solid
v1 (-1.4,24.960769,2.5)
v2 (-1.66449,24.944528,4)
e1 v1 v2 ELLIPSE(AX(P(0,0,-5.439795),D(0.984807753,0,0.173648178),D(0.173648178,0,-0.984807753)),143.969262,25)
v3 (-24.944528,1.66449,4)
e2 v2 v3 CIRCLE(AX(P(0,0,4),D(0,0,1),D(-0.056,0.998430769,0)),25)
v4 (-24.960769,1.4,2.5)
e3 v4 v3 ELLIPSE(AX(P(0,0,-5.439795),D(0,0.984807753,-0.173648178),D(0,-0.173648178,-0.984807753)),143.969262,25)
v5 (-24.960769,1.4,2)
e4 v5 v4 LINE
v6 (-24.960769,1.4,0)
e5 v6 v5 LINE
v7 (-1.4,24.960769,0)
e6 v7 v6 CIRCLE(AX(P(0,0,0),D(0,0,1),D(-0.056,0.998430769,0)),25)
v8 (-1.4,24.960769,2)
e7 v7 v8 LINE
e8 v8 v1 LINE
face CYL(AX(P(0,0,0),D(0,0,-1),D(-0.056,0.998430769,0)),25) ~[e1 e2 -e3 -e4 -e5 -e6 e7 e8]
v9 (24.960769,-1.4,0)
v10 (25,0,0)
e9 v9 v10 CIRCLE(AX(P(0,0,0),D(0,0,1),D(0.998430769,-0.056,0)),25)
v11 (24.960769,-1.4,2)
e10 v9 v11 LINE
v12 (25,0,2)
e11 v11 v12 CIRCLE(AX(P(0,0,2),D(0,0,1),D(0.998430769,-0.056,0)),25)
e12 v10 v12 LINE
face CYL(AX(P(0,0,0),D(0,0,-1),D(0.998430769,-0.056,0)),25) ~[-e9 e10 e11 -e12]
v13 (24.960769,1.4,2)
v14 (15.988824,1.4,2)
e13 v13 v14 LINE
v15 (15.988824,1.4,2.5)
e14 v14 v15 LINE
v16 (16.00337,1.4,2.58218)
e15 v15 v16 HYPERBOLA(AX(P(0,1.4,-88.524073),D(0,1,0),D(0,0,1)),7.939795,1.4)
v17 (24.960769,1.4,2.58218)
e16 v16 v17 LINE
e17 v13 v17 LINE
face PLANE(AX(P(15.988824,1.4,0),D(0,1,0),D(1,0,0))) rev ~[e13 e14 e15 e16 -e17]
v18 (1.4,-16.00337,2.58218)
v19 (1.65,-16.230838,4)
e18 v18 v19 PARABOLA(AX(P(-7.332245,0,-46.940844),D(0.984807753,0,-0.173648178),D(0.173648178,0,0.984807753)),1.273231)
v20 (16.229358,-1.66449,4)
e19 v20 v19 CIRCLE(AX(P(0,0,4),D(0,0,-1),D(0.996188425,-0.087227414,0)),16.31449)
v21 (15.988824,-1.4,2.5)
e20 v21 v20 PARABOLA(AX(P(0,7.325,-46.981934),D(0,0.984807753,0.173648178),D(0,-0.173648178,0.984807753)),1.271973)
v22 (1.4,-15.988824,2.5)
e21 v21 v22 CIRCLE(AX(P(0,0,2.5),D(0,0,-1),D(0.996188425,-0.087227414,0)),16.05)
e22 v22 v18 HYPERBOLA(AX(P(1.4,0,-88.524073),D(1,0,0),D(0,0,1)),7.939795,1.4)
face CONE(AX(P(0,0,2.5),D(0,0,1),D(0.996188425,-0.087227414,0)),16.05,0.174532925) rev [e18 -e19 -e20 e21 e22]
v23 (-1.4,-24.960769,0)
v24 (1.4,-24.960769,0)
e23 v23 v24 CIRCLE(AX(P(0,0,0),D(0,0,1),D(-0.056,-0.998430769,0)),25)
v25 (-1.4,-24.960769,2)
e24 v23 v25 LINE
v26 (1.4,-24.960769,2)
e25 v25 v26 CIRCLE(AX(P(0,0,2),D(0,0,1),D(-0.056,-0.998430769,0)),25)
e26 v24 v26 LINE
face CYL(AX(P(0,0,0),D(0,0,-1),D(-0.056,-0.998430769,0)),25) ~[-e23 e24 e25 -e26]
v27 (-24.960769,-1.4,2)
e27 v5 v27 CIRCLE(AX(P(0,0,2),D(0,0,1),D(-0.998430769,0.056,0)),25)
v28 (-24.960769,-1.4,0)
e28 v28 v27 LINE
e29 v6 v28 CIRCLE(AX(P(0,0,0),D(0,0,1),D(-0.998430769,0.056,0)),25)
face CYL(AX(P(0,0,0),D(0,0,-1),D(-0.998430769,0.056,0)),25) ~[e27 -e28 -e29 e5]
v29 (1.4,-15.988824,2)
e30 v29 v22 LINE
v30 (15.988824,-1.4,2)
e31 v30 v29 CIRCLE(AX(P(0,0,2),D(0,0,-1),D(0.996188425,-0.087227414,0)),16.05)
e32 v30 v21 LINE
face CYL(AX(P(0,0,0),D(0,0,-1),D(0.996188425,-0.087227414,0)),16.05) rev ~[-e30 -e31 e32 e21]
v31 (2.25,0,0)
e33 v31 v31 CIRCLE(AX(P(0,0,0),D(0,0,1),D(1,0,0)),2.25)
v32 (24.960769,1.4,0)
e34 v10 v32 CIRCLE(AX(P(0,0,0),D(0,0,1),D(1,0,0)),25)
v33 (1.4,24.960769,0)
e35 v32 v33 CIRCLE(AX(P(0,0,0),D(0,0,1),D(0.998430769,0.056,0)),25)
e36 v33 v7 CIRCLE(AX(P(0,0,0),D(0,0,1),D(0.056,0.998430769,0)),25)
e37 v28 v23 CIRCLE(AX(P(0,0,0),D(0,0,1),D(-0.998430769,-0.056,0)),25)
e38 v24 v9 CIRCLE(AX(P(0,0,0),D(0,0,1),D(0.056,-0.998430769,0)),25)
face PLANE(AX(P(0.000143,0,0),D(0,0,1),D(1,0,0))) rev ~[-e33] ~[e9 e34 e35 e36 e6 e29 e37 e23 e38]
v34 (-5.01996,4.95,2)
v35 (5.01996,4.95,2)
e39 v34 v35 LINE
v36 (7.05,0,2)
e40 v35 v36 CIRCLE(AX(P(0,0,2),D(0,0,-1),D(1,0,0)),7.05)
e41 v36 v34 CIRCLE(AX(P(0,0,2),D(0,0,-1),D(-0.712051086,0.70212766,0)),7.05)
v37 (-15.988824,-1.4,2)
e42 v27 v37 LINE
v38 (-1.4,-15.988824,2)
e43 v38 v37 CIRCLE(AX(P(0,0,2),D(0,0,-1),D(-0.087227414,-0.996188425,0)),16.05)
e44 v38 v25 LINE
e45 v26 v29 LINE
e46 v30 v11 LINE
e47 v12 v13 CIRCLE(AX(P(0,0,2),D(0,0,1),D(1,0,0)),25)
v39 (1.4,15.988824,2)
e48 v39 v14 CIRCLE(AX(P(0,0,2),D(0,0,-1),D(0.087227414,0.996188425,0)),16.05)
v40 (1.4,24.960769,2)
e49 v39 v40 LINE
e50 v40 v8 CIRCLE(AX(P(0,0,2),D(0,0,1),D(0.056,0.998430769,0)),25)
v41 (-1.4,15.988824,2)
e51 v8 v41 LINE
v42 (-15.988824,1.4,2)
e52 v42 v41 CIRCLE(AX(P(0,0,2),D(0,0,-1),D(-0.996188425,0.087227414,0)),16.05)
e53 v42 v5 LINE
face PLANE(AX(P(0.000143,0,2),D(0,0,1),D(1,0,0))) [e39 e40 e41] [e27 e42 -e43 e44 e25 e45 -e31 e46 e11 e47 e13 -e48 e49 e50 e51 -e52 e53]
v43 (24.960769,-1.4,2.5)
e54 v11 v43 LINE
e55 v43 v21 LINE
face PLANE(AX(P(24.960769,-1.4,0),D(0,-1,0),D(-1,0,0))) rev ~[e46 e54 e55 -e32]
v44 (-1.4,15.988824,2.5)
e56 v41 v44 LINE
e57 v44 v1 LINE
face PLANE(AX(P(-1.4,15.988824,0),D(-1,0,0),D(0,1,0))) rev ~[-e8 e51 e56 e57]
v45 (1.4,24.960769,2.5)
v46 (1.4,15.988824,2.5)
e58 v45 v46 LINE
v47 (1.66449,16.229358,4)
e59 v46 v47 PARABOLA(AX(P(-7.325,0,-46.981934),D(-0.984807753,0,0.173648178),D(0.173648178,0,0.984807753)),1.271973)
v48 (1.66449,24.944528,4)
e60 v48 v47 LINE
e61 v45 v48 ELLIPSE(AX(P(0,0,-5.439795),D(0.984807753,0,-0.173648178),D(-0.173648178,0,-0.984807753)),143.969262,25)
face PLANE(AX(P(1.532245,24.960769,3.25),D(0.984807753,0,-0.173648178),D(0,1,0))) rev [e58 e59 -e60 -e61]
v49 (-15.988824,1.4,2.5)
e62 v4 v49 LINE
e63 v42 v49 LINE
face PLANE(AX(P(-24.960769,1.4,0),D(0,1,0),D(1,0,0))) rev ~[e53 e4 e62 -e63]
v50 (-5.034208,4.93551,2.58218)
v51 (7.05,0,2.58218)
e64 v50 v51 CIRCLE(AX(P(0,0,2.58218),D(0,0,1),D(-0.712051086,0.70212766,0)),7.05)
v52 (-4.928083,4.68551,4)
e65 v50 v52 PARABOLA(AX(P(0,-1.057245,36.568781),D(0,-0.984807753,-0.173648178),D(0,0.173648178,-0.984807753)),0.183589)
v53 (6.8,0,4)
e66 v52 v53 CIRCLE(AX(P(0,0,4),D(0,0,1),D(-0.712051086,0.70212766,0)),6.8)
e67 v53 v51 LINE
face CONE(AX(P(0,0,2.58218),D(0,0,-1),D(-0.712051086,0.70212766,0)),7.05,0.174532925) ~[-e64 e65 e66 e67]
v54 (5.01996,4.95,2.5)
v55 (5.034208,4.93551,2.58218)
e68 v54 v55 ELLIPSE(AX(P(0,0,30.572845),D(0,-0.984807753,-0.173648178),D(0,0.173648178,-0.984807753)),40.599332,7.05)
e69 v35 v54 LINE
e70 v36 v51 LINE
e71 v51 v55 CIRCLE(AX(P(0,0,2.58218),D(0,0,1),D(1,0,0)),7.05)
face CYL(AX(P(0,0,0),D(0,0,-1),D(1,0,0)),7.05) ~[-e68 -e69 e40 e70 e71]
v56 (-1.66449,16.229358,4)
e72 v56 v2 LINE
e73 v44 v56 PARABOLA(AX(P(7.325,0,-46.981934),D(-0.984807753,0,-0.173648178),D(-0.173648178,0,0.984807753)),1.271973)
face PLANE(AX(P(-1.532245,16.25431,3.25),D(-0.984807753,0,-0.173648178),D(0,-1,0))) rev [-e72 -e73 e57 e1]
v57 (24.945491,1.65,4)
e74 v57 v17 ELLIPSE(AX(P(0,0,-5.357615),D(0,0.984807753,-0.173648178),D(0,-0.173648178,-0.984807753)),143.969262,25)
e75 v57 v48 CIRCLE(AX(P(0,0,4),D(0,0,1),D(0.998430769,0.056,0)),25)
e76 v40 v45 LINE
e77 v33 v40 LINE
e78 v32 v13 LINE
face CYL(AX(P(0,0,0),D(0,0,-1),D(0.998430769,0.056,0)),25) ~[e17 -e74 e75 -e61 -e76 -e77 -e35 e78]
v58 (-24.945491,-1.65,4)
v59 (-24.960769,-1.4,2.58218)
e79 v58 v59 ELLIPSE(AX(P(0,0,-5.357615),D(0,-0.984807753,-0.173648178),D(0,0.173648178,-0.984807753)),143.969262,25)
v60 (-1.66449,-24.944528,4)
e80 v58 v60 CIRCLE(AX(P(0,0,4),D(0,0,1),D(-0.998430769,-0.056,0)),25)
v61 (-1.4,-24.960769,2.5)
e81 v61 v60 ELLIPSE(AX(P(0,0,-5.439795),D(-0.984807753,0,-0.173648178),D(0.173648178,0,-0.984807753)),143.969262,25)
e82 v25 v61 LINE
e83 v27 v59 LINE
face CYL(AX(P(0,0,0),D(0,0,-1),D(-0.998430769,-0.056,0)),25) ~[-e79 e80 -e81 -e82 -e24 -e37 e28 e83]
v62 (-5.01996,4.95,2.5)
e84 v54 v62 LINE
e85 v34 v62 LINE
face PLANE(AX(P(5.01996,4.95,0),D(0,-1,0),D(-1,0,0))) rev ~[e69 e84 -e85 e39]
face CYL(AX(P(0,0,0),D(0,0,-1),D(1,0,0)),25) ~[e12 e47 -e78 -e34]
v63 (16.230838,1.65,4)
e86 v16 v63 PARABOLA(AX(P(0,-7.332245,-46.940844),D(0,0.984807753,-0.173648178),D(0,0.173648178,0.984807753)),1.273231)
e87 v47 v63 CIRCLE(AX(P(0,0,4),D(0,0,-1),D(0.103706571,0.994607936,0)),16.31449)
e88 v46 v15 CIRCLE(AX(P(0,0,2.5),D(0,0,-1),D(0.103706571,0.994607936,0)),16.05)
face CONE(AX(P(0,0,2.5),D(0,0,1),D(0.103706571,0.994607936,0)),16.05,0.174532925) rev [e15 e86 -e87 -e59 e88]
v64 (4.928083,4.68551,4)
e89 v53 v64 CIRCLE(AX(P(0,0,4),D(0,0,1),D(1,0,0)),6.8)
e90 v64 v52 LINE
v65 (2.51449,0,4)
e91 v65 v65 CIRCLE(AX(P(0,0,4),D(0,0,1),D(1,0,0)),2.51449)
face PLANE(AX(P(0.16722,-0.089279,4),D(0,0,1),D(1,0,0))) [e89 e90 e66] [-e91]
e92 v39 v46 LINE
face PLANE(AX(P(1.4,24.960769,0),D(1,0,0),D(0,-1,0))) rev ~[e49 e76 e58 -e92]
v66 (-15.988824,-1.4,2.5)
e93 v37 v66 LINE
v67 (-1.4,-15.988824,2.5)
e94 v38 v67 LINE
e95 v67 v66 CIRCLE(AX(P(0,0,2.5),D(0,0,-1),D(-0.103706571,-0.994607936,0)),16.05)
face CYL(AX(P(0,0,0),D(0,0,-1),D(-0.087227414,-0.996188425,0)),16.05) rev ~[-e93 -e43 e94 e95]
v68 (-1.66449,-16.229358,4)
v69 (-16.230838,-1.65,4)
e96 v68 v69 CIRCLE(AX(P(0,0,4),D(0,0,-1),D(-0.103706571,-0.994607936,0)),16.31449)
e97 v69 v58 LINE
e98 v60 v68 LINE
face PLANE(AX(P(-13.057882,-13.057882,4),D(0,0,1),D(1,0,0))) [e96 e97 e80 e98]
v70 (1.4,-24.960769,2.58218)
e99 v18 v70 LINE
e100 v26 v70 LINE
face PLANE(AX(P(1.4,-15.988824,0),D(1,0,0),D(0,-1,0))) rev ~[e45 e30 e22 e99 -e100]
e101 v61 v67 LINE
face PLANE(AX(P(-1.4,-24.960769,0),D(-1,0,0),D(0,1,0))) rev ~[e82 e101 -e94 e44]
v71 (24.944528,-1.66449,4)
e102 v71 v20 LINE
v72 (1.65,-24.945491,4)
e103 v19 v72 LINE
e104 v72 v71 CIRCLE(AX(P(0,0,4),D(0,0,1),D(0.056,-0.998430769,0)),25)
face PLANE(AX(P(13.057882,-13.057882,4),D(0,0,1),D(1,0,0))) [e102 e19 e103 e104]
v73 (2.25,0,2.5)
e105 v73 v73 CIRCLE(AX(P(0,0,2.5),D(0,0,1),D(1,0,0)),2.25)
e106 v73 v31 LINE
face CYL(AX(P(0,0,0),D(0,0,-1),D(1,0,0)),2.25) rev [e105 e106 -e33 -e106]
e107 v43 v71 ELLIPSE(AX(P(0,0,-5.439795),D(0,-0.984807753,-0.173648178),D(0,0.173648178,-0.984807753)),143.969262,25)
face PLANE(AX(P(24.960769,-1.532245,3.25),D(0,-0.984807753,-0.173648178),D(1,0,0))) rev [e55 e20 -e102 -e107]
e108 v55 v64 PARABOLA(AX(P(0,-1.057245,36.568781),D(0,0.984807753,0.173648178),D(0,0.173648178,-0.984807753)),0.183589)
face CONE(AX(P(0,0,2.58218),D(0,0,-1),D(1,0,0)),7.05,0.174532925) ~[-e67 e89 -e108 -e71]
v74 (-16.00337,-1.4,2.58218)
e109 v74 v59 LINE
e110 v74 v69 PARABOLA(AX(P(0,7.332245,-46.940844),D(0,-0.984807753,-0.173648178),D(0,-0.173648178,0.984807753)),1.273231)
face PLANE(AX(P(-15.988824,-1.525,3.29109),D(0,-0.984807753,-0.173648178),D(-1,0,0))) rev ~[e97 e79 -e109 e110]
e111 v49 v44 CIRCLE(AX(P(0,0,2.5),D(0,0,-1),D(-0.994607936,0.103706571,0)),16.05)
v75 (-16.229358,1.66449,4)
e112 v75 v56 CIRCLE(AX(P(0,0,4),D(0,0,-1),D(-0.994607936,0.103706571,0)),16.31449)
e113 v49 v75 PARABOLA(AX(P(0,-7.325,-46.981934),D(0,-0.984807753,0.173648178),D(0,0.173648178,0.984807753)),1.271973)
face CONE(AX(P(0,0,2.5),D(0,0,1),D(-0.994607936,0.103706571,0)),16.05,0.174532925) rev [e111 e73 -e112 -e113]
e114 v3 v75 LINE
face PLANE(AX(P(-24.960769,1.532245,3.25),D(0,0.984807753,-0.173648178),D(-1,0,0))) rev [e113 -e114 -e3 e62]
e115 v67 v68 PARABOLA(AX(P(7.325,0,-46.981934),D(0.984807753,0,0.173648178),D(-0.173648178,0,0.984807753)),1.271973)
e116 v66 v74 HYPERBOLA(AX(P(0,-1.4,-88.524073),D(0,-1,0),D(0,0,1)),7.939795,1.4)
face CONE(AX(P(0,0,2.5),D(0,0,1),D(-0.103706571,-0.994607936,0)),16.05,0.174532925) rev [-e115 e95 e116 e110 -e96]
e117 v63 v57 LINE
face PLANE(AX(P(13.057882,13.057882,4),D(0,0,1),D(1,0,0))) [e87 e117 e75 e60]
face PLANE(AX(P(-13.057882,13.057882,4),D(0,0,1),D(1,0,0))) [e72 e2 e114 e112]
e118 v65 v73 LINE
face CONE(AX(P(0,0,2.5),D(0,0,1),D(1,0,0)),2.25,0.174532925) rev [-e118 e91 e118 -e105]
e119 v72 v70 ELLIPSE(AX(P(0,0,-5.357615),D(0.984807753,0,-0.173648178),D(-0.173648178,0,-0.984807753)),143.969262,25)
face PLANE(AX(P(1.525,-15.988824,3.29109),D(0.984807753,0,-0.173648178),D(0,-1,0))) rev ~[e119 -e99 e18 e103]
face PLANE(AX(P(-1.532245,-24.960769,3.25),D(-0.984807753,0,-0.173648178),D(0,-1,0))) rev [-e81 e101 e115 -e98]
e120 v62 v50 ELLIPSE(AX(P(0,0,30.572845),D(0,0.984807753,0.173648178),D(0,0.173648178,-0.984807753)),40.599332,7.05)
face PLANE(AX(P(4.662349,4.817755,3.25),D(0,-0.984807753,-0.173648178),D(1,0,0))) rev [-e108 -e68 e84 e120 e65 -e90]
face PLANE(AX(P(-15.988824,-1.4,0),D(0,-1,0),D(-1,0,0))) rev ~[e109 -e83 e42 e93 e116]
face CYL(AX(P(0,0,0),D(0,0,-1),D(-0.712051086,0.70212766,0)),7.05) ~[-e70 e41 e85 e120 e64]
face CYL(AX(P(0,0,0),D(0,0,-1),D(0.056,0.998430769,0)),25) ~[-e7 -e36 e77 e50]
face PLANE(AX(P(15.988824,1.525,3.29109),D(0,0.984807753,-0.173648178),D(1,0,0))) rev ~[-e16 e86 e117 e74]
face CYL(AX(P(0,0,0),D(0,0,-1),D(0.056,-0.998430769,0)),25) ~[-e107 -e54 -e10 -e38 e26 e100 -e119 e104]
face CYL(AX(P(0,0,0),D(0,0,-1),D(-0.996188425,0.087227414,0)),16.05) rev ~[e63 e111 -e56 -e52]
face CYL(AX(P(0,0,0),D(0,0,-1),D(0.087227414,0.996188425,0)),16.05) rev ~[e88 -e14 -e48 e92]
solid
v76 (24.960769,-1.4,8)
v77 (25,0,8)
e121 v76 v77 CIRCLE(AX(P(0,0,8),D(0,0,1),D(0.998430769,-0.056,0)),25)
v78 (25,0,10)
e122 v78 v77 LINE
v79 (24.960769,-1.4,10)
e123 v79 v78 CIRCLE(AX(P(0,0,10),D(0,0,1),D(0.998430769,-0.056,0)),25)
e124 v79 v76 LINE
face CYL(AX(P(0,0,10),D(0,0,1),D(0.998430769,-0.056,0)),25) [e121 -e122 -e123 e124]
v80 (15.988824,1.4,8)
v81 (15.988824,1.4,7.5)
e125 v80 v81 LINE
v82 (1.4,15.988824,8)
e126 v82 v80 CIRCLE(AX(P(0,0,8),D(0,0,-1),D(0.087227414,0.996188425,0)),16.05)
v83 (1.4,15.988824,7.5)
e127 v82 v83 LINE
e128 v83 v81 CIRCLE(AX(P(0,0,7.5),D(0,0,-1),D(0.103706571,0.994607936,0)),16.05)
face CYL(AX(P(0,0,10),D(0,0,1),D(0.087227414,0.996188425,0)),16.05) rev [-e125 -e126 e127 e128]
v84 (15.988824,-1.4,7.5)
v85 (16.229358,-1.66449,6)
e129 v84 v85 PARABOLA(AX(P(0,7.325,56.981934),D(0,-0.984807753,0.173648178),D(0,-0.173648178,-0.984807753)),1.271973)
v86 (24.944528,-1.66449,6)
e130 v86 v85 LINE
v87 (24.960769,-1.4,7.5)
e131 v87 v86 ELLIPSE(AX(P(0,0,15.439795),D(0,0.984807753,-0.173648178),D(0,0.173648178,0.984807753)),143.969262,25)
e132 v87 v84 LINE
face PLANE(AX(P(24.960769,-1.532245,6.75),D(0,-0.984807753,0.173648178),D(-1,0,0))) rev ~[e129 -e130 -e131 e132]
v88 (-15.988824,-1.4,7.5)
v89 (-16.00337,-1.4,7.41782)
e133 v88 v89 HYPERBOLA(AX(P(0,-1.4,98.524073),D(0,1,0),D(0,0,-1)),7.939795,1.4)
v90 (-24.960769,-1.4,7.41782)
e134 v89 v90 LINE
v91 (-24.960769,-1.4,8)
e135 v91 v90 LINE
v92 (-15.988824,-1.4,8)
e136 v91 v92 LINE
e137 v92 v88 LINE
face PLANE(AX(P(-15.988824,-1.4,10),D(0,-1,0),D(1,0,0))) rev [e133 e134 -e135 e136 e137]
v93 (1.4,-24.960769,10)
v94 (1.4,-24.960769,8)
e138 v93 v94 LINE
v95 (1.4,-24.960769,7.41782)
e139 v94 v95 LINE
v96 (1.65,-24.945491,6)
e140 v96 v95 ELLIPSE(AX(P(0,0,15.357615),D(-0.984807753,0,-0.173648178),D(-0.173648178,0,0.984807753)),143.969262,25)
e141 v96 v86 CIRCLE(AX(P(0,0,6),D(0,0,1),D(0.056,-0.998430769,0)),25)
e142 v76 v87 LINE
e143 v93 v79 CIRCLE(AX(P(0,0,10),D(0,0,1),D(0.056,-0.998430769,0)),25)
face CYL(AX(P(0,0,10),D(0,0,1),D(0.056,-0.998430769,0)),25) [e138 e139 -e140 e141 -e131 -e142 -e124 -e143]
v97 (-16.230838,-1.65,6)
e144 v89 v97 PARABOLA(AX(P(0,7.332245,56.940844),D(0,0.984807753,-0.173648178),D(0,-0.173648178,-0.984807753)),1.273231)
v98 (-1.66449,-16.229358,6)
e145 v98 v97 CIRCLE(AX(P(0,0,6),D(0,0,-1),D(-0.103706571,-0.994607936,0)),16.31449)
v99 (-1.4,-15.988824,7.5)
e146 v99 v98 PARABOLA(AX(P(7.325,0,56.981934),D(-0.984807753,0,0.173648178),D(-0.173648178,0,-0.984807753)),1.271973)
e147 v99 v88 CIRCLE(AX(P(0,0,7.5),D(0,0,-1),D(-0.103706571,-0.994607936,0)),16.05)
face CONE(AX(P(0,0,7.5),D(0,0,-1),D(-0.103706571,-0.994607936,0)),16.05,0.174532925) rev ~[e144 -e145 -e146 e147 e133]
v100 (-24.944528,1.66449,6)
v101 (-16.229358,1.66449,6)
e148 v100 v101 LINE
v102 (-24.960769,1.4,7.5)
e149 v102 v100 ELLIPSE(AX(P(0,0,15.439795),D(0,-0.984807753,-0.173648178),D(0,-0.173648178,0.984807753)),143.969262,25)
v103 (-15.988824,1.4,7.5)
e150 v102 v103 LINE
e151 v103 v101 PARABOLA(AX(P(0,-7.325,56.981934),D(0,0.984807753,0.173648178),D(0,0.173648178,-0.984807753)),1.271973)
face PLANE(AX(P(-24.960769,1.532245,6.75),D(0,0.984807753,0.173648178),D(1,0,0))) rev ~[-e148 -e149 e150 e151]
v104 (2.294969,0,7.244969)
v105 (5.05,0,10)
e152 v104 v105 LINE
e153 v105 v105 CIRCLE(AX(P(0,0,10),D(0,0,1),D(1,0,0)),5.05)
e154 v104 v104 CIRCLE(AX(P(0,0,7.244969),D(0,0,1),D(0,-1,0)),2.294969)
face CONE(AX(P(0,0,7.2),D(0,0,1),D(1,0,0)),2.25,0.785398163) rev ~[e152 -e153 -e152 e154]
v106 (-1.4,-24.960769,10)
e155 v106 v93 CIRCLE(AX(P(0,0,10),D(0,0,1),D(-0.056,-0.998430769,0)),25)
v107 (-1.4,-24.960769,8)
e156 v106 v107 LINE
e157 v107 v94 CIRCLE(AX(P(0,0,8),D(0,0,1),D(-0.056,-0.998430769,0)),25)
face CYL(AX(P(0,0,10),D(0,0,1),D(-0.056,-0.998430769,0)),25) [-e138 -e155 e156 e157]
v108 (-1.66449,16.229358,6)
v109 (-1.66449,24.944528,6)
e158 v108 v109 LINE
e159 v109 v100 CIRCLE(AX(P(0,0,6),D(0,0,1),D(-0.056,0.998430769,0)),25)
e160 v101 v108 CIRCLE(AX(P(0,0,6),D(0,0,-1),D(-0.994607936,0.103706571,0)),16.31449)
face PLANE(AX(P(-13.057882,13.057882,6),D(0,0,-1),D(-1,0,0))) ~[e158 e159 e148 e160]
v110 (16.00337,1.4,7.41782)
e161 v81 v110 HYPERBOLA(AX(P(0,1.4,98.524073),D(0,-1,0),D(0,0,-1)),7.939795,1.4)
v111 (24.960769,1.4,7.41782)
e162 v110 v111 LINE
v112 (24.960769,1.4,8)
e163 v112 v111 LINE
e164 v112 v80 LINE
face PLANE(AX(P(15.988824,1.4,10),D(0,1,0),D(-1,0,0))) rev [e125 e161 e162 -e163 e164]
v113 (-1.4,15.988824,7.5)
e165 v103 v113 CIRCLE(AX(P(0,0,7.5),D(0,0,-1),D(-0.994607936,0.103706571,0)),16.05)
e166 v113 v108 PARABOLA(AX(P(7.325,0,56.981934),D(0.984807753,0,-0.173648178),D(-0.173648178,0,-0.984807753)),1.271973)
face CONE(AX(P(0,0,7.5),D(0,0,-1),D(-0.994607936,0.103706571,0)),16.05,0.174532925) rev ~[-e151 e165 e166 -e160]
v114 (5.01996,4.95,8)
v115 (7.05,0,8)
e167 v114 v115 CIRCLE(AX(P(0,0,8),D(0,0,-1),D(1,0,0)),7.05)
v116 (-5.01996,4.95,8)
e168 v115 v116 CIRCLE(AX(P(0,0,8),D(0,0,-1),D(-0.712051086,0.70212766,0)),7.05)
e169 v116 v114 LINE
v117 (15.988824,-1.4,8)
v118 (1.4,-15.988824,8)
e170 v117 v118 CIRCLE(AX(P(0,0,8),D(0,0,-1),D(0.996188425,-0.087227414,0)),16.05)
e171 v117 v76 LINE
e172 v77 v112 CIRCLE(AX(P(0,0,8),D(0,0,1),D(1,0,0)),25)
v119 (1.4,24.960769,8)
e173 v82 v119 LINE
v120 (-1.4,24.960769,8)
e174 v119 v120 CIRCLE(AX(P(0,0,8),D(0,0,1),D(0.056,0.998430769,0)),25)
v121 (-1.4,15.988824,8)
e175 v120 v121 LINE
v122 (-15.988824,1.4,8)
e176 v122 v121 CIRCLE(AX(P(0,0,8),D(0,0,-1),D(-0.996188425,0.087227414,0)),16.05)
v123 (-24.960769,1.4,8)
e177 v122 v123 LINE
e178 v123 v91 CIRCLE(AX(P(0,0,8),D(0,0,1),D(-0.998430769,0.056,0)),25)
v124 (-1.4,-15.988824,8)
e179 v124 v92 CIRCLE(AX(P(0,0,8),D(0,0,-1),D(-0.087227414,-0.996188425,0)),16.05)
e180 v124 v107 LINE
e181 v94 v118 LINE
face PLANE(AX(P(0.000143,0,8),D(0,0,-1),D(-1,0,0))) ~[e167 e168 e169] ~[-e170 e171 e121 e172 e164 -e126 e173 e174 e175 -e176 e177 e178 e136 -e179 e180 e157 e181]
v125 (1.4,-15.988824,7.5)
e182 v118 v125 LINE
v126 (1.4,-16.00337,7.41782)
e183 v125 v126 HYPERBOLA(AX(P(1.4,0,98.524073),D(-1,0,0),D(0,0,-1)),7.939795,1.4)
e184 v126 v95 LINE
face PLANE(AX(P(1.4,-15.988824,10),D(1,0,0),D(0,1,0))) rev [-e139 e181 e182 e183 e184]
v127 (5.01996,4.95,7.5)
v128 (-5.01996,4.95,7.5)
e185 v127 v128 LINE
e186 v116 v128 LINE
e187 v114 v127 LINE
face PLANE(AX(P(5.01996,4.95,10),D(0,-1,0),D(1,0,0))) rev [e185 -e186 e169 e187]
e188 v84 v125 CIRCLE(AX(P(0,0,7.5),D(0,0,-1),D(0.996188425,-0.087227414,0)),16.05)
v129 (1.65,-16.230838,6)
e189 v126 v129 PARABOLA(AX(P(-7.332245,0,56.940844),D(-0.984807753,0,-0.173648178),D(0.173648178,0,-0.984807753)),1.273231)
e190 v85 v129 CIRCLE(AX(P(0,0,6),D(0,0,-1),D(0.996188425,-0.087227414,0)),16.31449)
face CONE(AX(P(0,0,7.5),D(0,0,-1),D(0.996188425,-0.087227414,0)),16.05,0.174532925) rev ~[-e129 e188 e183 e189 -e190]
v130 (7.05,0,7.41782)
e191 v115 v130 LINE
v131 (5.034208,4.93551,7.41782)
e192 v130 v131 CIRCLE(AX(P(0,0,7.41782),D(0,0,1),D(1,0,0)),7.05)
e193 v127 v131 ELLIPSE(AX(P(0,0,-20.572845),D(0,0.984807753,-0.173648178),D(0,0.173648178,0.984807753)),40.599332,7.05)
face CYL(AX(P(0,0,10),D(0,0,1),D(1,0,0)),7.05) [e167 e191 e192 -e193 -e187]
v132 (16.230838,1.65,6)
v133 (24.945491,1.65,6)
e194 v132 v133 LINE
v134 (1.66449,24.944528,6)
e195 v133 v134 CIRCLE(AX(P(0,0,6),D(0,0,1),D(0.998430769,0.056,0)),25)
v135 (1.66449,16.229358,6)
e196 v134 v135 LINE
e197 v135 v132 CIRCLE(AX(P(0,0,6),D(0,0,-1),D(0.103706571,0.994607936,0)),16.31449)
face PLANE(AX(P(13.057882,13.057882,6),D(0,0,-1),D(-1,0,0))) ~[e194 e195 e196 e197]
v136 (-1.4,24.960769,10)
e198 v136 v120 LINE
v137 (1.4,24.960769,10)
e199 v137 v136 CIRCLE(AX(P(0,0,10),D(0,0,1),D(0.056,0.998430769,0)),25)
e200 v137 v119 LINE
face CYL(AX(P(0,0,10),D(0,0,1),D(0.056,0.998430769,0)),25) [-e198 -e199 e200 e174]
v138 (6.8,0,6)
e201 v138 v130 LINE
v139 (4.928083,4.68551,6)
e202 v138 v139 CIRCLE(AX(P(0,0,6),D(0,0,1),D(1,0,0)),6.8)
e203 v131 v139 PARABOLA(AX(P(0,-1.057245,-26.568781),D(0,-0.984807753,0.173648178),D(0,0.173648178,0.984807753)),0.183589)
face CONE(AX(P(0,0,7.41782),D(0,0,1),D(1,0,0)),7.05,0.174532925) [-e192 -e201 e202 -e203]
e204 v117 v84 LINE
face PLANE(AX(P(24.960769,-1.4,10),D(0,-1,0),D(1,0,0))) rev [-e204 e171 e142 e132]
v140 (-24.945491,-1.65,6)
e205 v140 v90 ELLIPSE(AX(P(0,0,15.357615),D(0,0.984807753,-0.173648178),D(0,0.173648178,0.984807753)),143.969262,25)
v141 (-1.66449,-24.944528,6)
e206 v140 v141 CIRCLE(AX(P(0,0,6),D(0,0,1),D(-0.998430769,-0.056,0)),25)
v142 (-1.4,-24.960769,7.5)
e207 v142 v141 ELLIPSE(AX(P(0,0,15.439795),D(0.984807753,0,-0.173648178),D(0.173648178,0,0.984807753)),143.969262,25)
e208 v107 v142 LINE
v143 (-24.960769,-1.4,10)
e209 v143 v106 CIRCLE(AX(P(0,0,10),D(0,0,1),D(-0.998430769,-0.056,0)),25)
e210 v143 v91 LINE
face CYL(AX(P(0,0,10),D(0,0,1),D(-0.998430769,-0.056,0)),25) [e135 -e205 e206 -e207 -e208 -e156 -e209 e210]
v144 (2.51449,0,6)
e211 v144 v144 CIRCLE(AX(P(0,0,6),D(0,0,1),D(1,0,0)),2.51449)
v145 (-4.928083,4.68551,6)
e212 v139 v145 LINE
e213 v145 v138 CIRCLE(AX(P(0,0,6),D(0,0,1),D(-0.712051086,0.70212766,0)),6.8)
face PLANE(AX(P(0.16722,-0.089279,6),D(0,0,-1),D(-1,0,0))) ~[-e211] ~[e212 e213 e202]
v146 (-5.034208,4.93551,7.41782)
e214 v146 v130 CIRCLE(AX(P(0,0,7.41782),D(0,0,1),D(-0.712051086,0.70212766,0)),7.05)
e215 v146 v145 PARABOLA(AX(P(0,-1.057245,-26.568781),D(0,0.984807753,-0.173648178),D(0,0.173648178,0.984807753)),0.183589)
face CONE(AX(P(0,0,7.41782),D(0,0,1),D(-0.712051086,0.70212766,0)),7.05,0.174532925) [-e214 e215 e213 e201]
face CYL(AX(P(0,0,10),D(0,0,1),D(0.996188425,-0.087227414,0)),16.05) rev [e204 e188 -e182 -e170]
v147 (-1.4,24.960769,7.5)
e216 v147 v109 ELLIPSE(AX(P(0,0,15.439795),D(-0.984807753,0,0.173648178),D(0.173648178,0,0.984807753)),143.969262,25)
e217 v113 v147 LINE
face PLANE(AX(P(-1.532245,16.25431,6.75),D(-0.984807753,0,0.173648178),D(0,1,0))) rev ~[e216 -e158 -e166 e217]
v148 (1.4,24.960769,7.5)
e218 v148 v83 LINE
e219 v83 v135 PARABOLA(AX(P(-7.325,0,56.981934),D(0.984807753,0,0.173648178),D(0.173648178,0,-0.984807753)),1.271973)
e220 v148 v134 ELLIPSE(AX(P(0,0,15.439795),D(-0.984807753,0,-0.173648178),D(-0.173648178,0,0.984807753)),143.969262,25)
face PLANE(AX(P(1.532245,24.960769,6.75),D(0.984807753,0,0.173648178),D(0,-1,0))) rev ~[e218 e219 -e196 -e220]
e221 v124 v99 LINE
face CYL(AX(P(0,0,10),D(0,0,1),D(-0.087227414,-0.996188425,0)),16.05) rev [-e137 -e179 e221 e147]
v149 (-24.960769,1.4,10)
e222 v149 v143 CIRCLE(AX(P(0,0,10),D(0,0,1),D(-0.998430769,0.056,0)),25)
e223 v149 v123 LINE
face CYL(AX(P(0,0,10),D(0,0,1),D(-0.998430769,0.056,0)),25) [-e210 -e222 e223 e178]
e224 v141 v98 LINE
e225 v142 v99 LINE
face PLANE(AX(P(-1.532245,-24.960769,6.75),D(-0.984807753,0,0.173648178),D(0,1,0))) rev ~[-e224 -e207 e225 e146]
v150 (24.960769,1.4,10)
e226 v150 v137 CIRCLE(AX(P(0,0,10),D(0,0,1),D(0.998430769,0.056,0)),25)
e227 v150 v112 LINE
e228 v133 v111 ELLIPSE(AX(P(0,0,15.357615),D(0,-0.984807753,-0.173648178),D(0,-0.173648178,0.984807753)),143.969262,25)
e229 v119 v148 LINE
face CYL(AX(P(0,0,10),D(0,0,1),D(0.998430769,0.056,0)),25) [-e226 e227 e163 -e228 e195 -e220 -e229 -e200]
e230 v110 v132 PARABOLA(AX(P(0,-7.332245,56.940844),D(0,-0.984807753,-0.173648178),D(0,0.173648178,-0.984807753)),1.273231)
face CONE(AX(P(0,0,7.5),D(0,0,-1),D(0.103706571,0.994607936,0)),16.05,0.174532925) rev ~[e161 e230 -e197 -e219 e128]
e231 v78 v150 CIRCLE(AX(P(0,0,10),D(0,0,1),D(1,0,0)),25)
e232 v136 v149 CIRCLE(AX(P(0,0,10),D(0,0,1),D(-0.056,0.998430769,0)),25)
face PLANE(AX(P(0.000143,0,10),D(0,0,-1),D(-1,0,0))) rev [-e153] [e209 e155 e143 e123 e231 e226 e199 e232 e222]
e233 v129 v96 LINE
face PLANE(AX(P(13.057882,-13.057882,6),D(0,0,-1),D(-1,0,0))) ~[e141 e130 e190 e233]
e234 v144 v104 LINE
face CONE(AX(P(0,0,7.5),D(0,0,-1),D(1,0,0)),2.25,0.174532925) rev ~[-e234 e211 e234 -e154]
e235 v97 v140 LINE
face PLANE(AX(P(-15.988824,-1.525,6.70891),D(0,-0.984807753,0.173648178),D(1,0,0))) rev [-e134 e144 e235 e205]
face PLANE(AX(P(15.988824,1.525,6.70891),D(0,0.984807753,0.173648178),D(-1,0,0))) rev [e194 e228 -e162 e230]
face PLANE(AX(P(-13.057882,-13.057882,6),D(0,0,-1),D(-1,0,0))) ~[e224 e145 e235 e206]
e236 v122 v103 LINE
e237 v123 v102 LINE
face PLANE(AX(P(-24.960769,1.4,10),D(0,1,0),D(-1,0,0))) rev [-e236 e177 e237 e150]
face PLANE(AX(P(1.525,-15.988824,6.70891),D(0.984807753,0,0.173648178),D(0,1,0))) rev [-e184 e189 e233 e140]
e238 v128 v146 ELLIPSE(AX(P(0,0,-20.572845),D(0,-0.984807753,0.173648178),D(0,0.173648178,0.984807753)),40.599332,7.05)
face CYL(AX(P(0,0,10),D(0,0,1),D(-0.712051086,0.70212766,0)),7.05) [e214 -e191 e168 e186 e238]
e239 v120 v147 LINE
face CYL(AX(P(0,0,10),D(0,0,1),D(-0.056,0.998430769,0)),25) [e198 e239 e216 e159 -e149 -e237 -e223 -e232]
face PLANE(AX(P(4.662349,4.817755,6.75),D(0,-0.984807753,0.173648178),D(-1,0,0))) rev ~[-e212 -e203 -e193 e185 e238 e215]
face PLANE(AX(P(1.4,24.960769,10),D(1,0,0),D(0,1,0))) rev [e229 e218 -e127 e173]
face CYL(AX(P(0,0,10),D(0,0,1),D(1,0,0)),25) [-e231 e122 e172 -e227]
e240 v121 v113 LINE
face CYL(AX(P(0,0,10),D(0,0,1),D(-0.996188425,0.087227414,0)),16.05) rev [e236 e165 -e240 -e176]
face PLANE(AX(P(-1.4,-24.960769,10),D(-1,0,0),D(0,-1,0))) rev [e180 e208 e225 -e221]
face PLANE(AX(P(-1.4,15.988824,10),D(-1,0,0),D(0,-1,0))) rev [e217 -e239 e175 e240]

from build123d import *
from build123d import SkipClean  # not in build123d's __all__

# Parameters (mm, degrees)
F0_R         = 2.25
F1_DEPTH     = 2
F2_DEPTH     = 4
F3_SIZE2     = 1.4178204549
F3_SIZE      = 0.25
F3_2_SIZE2   = 1.4178204549
F3_2_SIZE    = 0.25
F3_3_SIZE2   = 1.4178204549
F3_3_SIZE    = 0.25
F3_4_SIZE2   = 1.4178204549
F3_4_SIZE    = 0.25
F4_C1_SIZE2  = 0.2644904711
F4_C1_SIZE   = 1.5
F4_C2_SIZE2  = 0.2644904711
F4_C2_SIZE   = 1.5
F4_C3_SIZE2  = 0.2644904711
F4_C3_SIZE   = 1.5
F4_C4_SIZE2  = 0.2644904711
F4_C4_SIZE   = 1.5
F4_C5_SIZE2  = 0.2644904711
F4_C5_SIZE   = 1.5
F4_C6_SIZE2  = 0.2644904711
F4_C6_SIZE   = 1.5
F4_C7_SIZE2  = 0.2644904711
F4_C7_SIZE   = 1.5
F4_C8_SIZE2  = 0.2644904711
F4_C8_SIZE   = 1.5
F4_C9_SIZE2  = 0.2644904711
F4_C9_SIZE   = 1.5
F4_C10_SIZE2 = 0.2644904711
F4_C10_SIZE  = 1.5
F4_C11_SIZE2 = 1.5
F4_C11_SIZE  = 0.2644904711


# Not quite as in the source:
# - a fillet or chamfer that OpenCascade refuses, or shapes differently, is made with other operations: its cross-section is extruded or revolved along the edge and cut away or added


with BuildPart() as f1:
    # F0 (on Top) → F1 (new body)
    with BuildSketch(Plane.XY):
        with BuildLine():
            ThreePointArc((15.9888242219, -1.4), (16.0346987618, -0.7006679805), (16.05, 0))
            ThreePointArc((16.05, 0), (16.0346987618, 0.7006679805), (15.9888242219, 1.4))
            ThreePointArc((15.9888242219, 1.4), (11.349063838, 11.349063838), (1.4, 15.9888242219))
            ThreePointArc((1.4, 15.9888242219), (0, 16.05), (-1.4, 15.9888242219))
            ThreePointArc((-1.4, 15.9888242219), (-11.349063838, 11.349063838), (-15.9888242219, 1.4))
            ThreePointArc((-15.9888242219, 1.4), (-16.05, 0), (-15.9888242219, -1.4))
            ThreePointArc((-15.9888242219, -1.4), (-11.349063838, -11.349063838), (-1.4, -15.9888242219))
            ThreePointArc((-1.4, -15.9888242219), (0, -16.05), (1.4, -15.9888242219))
            ThreePointArc((1.4, -15.9888242219), (11.349063838, -11.349063838), (15.9888242219, -1.4))
        make_face()
        with BuildLine():
            ThreePointArc((5.0199601592, 4.95), (6.5227762158, 2.6750496143), (7.05, 0))
            ThreePointArc((7.05, 0), (-2.6750496143, -6.5227762158), (-5.0199601592, 4.95))
            ThreePointArc((-5.0199601592, 4.95), (0, 7.05), (5.0199601592, 4.95))
        make_face(mode=Mode.SUBTRACT)
        with BuildLine():
            ThreePointArc((-5.0199601592, 4.95), (-2.6750496143, -6.5227762158), (7.05, 0))
            ThreePointArc((7.05, 0), (6.5227762158, 2.6750496143), (5.0199601592, 4.95))
            Line((5.0199601592, 4.95), (-5.0199601592, 4.95))
        make_face()
        Circle(F0_R, mode=Mode.SUBTRACT)
        with BuildLine():
            Line((-5.0199601592, 4.95), (5.0199601592, 4.95))
            ThreePointArc((5.0199601592, 4.95), (0, 7.05), (-5.0199601592, 4.95))
        make_face()
        with BuildLine():
            ThreePointArc((1.4, 15.9888242219), (11.349063838, 11.349063838), (15.9888242219, 1.4))
            Line((15.9888242219, 1.4), (24.9607692189, 1.4))
            ThreePointArc((24.9607692189, 1.4), (17.6776695297, 17.6776695297), (1.4, 24.9607692189))
            Line((1.4, 24.9607692189), (1.4, 15.9888242219))
        make_face()
        with BuildLine():
            ThreePointArc((-15.9888242219, 1.4), (-11.349063838, 11.349063838), (-1.4, 15.9888242219))
            Line((-1.4, 15.9888242219), (-1.4, 24.9607692189))
            ThreePointArc((-1.4, 24.9607692189), (-17.6776695297, 17.6776695297), (-24.9607692189, 1.4))
            Line((-24.9607692189, 1.4), (-15.9888242219, 1.4))
        make_face()
        with BuildLine():
            ThreePointArc((-1.4, 15.9888242219), (0, 16.05), (1.4, 15.9888242219))
            Line((1.4, 15.9888242219), (1.4, 24.9607692189))
            ThreePointArc((1.4, 24.9607692189), (0, 25), (-1.4, 24.9607692189))
            Line((-1.4, 24.9607692189), (-1.4, 15.9888242219))
        make_face()
        with BuildLine():
            ThreePointArc((-15.9888242219, -1.4), (-16.05, 0), (-15.9888242219, 1.4))
            Line((-15.9888242219, 1.4), (-24.9607692189, 1.4))
            ThreePointArc((-24.9607692189, 1.4), (-25, 0), (-24.9607692189, -1.4))
            Line((-24.9607692189, -1.4), (-15.9888242219, -1.4))
        make_face()
        with BuildLine():
            Line((-1.4, -24.9607692189), (-1.4, -15.9888242219))
            ThreePointArc((-1.4, -15.9888242219), (-11.349063838, -11.349063838), (-15.9888242219, -1.4))
            Line((-15.9888242219, -1.4), (-24.9607692189, -1.4))
            ThreePointArc((-24.9607692189, -1.4), (-17.6776695297, -17.6776695297), (-1.4, -24.9607692189))
        make_face()
        with BuildLine():
            Line((1.4, -24.9607692189), (1.4, -15.9888242219))
            ThreePointArc((1.4, -15.9888242219), (0, -16.05), (-1.4, -15.9888242219))
            Line((-1.4, -15.9888242219), (-1.4, -24.9607692189))
            ThreePointArc((-1.4, -24.9607692189), (0, -25), (1.4, -24.9607692189))
        make_face()
        with BuildLine():
            Line((24.9607692189, -1.4), (15.9888242219, -1.4))
            ThreePointArc((15.9888242219, -1.4), (11.349063838, -11.349063838), (1.4, -15.9888242219))
            Line((1.4, -15.9888242219), (1.4, -24.9607692189))
            ThreePointArc((1.4, -24.9607692189), (17.6776695297, -17.6776695297), (24.9607692189, -1.4))
        make_face()
        with BuildLine():
            ThreePointArc((15.9888242219, 1.4), (16.0346987618, 0.7006679805), (16.05, 0))
            ThreePointArc((16.05, 0), (16.0346987618, -0.7006679805), (15.9888242219, -1.4))
            Line((15.9888242219, -1.4), (24.9607692189, -1.4))
            ThreePointArc((24.9607692189, -1.4), (24.9901903802, -0.7002747772), (25, 0))
            ThreePointArc((25, 0), (24.9901903802, 0.7002747772), (24.9607692189, 1.4))
            Line((24.9607692189, 1.4), (15.9888242219, 1.4))
        make_face()
    extrude(amount=F1_DEPTH)

    # F0 (on Top) → F2 (join)
    with BuildSketch(Plane.XY):
        with BuildLine():
            ThreePointArc((-5.0199601592, 4.95), (-2.6750496143, -6.5227762158), (7.05, 0))
            ThreePointArc((7.05, 0), (6.5227762158, 2.6750496143), (5.0199601592, 4.95))
            Line((5.0199601592, 4.95), (-5.0199601592, 4.95))
        make_face()
        Circle(F0_R, mode=Mode.SUBTRACT)
        with BuildLine():
            Line((24.9607692189, -1.4), (15.9888242219, -1.4))
            ThreePointArc((15.9888242219, -1.4), (11.349063838, -11.349063838), (1.4, -15.9888242219))
            Line((1.4, -15.9888242219), (1.4, -24.9607692189))
            ThreePointArc((1.4, -24.9607692189), (17.6776695297, -17.6776695297), (24.9607692189, -1.4))
        make_face()
        with BuildLine():
            Line((-1.4, -24.9607692189), (-1.4, -15.9888242219))
            ThreePointArc((-1.4, -15.9888242219), (-11.349063838, -11.349063838), (-15.9888242219, -1.4))
            Line((-15.9888242219, -1.4), (-24.9607692189, -1.4))
            ThreePointArc((-24.9607692189, -1.4), (-17.6776695297, -17.6776695297), (-1.4, -24.9607692189))
        make_face()
        with BuildLine():
            ThreePointArc((-15.9888242219, 1.4), (-11.349063838, 11.349063838), (-1.4, 15.9888242219))
            Line((-1.4, 15.9888242219), (-1.4, 24.9607692189))
            ThreePointArc((-1.4, 24.9607692189), (-17.6776695297, 17.6776695297), (-24.9607692189, 1.4))
            Line((-24.9607692189, 1.4), (-15.9888242219, 1.4))
        make_face()
        with BuildLine():
            ThreePointArc((1.4, 15.9888242219), (11.349063838, 11.349063838), (15.9888242219, 1.4))
            Line((15.9888242219, 1.4), (24.9607692189, 1.4))
            ThreePointArc((24.9607692189, 1.4), (17.6776695297, 17.6776695297), (1.4, 24.9607692189))
            Line((1.4, 24.9607692189), (1.4, 15.9888242219))
        make_face()
    with SkipClean():  # cleaning this boolean's faces spoils the solid; the shape is the same uncleaned
        extrude(amount=F2_DEPTH)

    # F3
    f3_edges = [f1.edges().sort_by_distance(p)[0] for p in [
        (-20.474797, -1.4, 4),
    ]]
    f3_side = f1.faces().sort_by_distance((-13.527768, -13.527768, 4))[0]
    chamfer(f3_edges, length=F3_SIZE, length2=F3_SIZE2, reference=f3_side)

    # F3#2
    f3_2_edges = [f1.edges().sort_by_distance(p)[0] for p in [
        (20.474797, 1.4, 4),
    ]]
    f3_2_side = f1.faces().sort_by_distance((13.527768, 13.527768, 4))[0]
    chamfer(f3_2_edges, length=F3_2_SIZE, length2=F3_2_SIZE2, reference=f3_2_side)

    # F3#3
    f3_3_edges = [f1.edges().sort_by_distance(p)[0] for p in [
        (0, -7.05, 4),
    ]]
    f3_3_side = f1.faces().sort_by_distance((0, -6.864849, 4))[0]
    chamfer(f3_3_edges, length=F3_3_SIZE, length2=F3_3_SIZE2, reference=f3_3_side)

    # F3#4
    f3_4_edges = [f1.edges().sort_by_distance(p)[0] for p in [
        (1.4, -20.474797, 4),
    ]]
    f3_4_side = f1.faces().sort_by_distance((13.527768, -13.527768, 4))[0]
    chamfer(f3_4_edges, length=F3_4_SIZE, length2=F3_4_SIZE2, reference=f3_4_side)

    # F4: chamfer of 1.5 x 0.2644904711 on 11 edges, made by hand

    # F4_c1
    f4_c1_edges = [f1.edges().sort_by_distance(p)[0] for p in [
        (11.4375065831, -11.2599264279, 4),
    ]]
    f4_c1_side = f1.faces().sort_by_distance((11.4375065831, -11.2599264279, 3.9947101906))[0]
    chamfer(f4_c1_edges, length=F4_C1_SIZE, length2=F4_C1_SIZE2, reference=f4_c1_side)

    # F4_c2
    f4_c2_edges = [f1.edges().sort_by_distance(p)[0] for p in [
        (20.607539698, -1.4, 4),
    ]]
    f4_c2_side = f1.faces().sort_by_distance((20.607539698, -1.4, 3.9947101906))[0]
    chamfer(f4_c2_edges, length=F4_C2_SIZE, length2=F4_C2_SIZE2, reference=f4_c2_side)

    # F4_c3
    f4_c3_edges = [f1.edges().sort_by_distance(p)[0] for p in [
        (-1.4, -20.4747967204, 4),
    ]]
    f4_c3_side = f1.faces().sort_by_distance((-1.4, -20.4747967204, 3.9947101906))[0]
    chamfer(f4_c3_edges, length=F4_C3_SIZE, length2=F4_C3_SIZE2, reference=f4_c3_side)

    # F4_c4
    f4_c4_edges = [f1.edges().sort_by_distance(p)[0] for p in [
        (-11.3542133554, -11.3439119831, 4),
    ]]
    f4_c4_side = f1.faces().sort_by_distance((-11.3542133554, -11.3439119831, 3.9947101906))[0]
    chamfer(f4_c4_edges, length=F4_C4_SIZE, length2=F4_C4_SIZE2, reference=f4_c4_side)

    # F4_c5
    f4_c5_edges = [f1.edges().sort_by_distance(p)[0] for p in [
        (-20.4747967204, 1.4, 4),
    ]]
    f4_c5_side = f1.faces().sort_by_distance((-20.4747967204, 1.4, 3.9947101906))[0]
    chamfer(f4_c5_edges, length=F4_C5_SIZE, length2=F4_C5_SIZE2, reference=f4_c5_side)

    # F4_c6
    f4_c6_edges = [f1.edges().sort_by_distance(p)[0] for p in [
        (-11.2547344431, 11.442615637, 4),
    ]]
    f4_c6_side = f1.faces().sort_by_distance((-11.2547344431, 11.442615637, 3.9947101906))[0]
    chamfer(f4_c6_edges, length=F4_C6_SIZE, length2=F4_C6_SIZE2, reference=f4_c6_side)

    # F4_c7
    f4_c7_edges = [f1.edges().sort_by_distance(p)[0] for p in [
        (-1.4, 20.607539698, 4),
    ]]
    f4_c7_side = f1.faces().sort_by_distance((-1.4, 20.607539698, 3.9947101906))[0]
    chamfer(f4_c7_edges, length=F4_C7_SIZE, length2=F4_C7_SIZE2, reference=f4_c7_side)

    # F4_c8
    f4_c8_edges = [f1.edges().sort_by_distance(p)[0] for p in [
        (1.4, 20.4747967204, 4),
    ]]
    f4_c8_side = f1.faces().sort_by_distance((1.4, 20.4747967204, 3.9947101906))[0]
    chamfer(f4_c8_edges, length=F4_C8_SIZE, length2=F4_C8_SIZE2, reference=f4_c8_side)

    # F4_c9
    f4_c9_edges = [f1.edges().sort_by_distance(p)[0] for p in [
        (11.3542133554, 11.3439119831, 4),
    ]]
    f4_c9_side = f1.faces().sort_by_distance((11.3542133554, 11.3439119831, 3.9947101906))[0]
    chamfer(f4_c9_edges, length=F4_C9_SIZE, length2=F4_C9_SIZE2, reference=f4_c9_side)

    # F4_c10
    f4_c10_edges = [f1.edges().sort_by_distance(p)[0] for p in [
        (0, 4.95, 4),
    ]]
    f4_c10_side = f1.faces().sort_by_distance((0, 4.95, 3.9947101906))[0]
    chamfer(f4_c10_edges, length=F4_C10_SIZE, length2=F4_C10_SIZE2, reference=f4_c10_side)

    # F4_c11
    f4_c11_edges = [f1.edges().sort_by_distance(p)[0] for p in [
        (-2.25, 0, 4),
    ]]
    f4_c11_side = f1.faces().sort_by_distance((-2.2552898094, 0, 4))[0]
    chamfer(f4_c11_edges, length=F4_C11_SIZE, length2=F4_C11_SIZE2, reference=f4_c11_side)


with BuildPart() as f5_1:
    # F5: instance of F1
    add(f1.part.mirror(Plane.XY), clean=False)


with BuildPart() as f5_1_1:
    # F6: moved
    add(f5_1.part.moved(Location((0, 0, 10))), clean=False)

    # F7: chamfer of 2.8 on 1 edges, made by hand

    # F7_s1 → F7_t2 (revolve, cut)
    with BuildSketch(Plane.XZ):
        Polygon((2.25, 7.2), (5.05, 10), (2.25, 10), align=None)
    revolve(axis=Axis((0, 0, 10), (0, 0, 1)), mode=Mode.SUBTRACT)


solid = Compound([f1.part, f5_1_1.part])
